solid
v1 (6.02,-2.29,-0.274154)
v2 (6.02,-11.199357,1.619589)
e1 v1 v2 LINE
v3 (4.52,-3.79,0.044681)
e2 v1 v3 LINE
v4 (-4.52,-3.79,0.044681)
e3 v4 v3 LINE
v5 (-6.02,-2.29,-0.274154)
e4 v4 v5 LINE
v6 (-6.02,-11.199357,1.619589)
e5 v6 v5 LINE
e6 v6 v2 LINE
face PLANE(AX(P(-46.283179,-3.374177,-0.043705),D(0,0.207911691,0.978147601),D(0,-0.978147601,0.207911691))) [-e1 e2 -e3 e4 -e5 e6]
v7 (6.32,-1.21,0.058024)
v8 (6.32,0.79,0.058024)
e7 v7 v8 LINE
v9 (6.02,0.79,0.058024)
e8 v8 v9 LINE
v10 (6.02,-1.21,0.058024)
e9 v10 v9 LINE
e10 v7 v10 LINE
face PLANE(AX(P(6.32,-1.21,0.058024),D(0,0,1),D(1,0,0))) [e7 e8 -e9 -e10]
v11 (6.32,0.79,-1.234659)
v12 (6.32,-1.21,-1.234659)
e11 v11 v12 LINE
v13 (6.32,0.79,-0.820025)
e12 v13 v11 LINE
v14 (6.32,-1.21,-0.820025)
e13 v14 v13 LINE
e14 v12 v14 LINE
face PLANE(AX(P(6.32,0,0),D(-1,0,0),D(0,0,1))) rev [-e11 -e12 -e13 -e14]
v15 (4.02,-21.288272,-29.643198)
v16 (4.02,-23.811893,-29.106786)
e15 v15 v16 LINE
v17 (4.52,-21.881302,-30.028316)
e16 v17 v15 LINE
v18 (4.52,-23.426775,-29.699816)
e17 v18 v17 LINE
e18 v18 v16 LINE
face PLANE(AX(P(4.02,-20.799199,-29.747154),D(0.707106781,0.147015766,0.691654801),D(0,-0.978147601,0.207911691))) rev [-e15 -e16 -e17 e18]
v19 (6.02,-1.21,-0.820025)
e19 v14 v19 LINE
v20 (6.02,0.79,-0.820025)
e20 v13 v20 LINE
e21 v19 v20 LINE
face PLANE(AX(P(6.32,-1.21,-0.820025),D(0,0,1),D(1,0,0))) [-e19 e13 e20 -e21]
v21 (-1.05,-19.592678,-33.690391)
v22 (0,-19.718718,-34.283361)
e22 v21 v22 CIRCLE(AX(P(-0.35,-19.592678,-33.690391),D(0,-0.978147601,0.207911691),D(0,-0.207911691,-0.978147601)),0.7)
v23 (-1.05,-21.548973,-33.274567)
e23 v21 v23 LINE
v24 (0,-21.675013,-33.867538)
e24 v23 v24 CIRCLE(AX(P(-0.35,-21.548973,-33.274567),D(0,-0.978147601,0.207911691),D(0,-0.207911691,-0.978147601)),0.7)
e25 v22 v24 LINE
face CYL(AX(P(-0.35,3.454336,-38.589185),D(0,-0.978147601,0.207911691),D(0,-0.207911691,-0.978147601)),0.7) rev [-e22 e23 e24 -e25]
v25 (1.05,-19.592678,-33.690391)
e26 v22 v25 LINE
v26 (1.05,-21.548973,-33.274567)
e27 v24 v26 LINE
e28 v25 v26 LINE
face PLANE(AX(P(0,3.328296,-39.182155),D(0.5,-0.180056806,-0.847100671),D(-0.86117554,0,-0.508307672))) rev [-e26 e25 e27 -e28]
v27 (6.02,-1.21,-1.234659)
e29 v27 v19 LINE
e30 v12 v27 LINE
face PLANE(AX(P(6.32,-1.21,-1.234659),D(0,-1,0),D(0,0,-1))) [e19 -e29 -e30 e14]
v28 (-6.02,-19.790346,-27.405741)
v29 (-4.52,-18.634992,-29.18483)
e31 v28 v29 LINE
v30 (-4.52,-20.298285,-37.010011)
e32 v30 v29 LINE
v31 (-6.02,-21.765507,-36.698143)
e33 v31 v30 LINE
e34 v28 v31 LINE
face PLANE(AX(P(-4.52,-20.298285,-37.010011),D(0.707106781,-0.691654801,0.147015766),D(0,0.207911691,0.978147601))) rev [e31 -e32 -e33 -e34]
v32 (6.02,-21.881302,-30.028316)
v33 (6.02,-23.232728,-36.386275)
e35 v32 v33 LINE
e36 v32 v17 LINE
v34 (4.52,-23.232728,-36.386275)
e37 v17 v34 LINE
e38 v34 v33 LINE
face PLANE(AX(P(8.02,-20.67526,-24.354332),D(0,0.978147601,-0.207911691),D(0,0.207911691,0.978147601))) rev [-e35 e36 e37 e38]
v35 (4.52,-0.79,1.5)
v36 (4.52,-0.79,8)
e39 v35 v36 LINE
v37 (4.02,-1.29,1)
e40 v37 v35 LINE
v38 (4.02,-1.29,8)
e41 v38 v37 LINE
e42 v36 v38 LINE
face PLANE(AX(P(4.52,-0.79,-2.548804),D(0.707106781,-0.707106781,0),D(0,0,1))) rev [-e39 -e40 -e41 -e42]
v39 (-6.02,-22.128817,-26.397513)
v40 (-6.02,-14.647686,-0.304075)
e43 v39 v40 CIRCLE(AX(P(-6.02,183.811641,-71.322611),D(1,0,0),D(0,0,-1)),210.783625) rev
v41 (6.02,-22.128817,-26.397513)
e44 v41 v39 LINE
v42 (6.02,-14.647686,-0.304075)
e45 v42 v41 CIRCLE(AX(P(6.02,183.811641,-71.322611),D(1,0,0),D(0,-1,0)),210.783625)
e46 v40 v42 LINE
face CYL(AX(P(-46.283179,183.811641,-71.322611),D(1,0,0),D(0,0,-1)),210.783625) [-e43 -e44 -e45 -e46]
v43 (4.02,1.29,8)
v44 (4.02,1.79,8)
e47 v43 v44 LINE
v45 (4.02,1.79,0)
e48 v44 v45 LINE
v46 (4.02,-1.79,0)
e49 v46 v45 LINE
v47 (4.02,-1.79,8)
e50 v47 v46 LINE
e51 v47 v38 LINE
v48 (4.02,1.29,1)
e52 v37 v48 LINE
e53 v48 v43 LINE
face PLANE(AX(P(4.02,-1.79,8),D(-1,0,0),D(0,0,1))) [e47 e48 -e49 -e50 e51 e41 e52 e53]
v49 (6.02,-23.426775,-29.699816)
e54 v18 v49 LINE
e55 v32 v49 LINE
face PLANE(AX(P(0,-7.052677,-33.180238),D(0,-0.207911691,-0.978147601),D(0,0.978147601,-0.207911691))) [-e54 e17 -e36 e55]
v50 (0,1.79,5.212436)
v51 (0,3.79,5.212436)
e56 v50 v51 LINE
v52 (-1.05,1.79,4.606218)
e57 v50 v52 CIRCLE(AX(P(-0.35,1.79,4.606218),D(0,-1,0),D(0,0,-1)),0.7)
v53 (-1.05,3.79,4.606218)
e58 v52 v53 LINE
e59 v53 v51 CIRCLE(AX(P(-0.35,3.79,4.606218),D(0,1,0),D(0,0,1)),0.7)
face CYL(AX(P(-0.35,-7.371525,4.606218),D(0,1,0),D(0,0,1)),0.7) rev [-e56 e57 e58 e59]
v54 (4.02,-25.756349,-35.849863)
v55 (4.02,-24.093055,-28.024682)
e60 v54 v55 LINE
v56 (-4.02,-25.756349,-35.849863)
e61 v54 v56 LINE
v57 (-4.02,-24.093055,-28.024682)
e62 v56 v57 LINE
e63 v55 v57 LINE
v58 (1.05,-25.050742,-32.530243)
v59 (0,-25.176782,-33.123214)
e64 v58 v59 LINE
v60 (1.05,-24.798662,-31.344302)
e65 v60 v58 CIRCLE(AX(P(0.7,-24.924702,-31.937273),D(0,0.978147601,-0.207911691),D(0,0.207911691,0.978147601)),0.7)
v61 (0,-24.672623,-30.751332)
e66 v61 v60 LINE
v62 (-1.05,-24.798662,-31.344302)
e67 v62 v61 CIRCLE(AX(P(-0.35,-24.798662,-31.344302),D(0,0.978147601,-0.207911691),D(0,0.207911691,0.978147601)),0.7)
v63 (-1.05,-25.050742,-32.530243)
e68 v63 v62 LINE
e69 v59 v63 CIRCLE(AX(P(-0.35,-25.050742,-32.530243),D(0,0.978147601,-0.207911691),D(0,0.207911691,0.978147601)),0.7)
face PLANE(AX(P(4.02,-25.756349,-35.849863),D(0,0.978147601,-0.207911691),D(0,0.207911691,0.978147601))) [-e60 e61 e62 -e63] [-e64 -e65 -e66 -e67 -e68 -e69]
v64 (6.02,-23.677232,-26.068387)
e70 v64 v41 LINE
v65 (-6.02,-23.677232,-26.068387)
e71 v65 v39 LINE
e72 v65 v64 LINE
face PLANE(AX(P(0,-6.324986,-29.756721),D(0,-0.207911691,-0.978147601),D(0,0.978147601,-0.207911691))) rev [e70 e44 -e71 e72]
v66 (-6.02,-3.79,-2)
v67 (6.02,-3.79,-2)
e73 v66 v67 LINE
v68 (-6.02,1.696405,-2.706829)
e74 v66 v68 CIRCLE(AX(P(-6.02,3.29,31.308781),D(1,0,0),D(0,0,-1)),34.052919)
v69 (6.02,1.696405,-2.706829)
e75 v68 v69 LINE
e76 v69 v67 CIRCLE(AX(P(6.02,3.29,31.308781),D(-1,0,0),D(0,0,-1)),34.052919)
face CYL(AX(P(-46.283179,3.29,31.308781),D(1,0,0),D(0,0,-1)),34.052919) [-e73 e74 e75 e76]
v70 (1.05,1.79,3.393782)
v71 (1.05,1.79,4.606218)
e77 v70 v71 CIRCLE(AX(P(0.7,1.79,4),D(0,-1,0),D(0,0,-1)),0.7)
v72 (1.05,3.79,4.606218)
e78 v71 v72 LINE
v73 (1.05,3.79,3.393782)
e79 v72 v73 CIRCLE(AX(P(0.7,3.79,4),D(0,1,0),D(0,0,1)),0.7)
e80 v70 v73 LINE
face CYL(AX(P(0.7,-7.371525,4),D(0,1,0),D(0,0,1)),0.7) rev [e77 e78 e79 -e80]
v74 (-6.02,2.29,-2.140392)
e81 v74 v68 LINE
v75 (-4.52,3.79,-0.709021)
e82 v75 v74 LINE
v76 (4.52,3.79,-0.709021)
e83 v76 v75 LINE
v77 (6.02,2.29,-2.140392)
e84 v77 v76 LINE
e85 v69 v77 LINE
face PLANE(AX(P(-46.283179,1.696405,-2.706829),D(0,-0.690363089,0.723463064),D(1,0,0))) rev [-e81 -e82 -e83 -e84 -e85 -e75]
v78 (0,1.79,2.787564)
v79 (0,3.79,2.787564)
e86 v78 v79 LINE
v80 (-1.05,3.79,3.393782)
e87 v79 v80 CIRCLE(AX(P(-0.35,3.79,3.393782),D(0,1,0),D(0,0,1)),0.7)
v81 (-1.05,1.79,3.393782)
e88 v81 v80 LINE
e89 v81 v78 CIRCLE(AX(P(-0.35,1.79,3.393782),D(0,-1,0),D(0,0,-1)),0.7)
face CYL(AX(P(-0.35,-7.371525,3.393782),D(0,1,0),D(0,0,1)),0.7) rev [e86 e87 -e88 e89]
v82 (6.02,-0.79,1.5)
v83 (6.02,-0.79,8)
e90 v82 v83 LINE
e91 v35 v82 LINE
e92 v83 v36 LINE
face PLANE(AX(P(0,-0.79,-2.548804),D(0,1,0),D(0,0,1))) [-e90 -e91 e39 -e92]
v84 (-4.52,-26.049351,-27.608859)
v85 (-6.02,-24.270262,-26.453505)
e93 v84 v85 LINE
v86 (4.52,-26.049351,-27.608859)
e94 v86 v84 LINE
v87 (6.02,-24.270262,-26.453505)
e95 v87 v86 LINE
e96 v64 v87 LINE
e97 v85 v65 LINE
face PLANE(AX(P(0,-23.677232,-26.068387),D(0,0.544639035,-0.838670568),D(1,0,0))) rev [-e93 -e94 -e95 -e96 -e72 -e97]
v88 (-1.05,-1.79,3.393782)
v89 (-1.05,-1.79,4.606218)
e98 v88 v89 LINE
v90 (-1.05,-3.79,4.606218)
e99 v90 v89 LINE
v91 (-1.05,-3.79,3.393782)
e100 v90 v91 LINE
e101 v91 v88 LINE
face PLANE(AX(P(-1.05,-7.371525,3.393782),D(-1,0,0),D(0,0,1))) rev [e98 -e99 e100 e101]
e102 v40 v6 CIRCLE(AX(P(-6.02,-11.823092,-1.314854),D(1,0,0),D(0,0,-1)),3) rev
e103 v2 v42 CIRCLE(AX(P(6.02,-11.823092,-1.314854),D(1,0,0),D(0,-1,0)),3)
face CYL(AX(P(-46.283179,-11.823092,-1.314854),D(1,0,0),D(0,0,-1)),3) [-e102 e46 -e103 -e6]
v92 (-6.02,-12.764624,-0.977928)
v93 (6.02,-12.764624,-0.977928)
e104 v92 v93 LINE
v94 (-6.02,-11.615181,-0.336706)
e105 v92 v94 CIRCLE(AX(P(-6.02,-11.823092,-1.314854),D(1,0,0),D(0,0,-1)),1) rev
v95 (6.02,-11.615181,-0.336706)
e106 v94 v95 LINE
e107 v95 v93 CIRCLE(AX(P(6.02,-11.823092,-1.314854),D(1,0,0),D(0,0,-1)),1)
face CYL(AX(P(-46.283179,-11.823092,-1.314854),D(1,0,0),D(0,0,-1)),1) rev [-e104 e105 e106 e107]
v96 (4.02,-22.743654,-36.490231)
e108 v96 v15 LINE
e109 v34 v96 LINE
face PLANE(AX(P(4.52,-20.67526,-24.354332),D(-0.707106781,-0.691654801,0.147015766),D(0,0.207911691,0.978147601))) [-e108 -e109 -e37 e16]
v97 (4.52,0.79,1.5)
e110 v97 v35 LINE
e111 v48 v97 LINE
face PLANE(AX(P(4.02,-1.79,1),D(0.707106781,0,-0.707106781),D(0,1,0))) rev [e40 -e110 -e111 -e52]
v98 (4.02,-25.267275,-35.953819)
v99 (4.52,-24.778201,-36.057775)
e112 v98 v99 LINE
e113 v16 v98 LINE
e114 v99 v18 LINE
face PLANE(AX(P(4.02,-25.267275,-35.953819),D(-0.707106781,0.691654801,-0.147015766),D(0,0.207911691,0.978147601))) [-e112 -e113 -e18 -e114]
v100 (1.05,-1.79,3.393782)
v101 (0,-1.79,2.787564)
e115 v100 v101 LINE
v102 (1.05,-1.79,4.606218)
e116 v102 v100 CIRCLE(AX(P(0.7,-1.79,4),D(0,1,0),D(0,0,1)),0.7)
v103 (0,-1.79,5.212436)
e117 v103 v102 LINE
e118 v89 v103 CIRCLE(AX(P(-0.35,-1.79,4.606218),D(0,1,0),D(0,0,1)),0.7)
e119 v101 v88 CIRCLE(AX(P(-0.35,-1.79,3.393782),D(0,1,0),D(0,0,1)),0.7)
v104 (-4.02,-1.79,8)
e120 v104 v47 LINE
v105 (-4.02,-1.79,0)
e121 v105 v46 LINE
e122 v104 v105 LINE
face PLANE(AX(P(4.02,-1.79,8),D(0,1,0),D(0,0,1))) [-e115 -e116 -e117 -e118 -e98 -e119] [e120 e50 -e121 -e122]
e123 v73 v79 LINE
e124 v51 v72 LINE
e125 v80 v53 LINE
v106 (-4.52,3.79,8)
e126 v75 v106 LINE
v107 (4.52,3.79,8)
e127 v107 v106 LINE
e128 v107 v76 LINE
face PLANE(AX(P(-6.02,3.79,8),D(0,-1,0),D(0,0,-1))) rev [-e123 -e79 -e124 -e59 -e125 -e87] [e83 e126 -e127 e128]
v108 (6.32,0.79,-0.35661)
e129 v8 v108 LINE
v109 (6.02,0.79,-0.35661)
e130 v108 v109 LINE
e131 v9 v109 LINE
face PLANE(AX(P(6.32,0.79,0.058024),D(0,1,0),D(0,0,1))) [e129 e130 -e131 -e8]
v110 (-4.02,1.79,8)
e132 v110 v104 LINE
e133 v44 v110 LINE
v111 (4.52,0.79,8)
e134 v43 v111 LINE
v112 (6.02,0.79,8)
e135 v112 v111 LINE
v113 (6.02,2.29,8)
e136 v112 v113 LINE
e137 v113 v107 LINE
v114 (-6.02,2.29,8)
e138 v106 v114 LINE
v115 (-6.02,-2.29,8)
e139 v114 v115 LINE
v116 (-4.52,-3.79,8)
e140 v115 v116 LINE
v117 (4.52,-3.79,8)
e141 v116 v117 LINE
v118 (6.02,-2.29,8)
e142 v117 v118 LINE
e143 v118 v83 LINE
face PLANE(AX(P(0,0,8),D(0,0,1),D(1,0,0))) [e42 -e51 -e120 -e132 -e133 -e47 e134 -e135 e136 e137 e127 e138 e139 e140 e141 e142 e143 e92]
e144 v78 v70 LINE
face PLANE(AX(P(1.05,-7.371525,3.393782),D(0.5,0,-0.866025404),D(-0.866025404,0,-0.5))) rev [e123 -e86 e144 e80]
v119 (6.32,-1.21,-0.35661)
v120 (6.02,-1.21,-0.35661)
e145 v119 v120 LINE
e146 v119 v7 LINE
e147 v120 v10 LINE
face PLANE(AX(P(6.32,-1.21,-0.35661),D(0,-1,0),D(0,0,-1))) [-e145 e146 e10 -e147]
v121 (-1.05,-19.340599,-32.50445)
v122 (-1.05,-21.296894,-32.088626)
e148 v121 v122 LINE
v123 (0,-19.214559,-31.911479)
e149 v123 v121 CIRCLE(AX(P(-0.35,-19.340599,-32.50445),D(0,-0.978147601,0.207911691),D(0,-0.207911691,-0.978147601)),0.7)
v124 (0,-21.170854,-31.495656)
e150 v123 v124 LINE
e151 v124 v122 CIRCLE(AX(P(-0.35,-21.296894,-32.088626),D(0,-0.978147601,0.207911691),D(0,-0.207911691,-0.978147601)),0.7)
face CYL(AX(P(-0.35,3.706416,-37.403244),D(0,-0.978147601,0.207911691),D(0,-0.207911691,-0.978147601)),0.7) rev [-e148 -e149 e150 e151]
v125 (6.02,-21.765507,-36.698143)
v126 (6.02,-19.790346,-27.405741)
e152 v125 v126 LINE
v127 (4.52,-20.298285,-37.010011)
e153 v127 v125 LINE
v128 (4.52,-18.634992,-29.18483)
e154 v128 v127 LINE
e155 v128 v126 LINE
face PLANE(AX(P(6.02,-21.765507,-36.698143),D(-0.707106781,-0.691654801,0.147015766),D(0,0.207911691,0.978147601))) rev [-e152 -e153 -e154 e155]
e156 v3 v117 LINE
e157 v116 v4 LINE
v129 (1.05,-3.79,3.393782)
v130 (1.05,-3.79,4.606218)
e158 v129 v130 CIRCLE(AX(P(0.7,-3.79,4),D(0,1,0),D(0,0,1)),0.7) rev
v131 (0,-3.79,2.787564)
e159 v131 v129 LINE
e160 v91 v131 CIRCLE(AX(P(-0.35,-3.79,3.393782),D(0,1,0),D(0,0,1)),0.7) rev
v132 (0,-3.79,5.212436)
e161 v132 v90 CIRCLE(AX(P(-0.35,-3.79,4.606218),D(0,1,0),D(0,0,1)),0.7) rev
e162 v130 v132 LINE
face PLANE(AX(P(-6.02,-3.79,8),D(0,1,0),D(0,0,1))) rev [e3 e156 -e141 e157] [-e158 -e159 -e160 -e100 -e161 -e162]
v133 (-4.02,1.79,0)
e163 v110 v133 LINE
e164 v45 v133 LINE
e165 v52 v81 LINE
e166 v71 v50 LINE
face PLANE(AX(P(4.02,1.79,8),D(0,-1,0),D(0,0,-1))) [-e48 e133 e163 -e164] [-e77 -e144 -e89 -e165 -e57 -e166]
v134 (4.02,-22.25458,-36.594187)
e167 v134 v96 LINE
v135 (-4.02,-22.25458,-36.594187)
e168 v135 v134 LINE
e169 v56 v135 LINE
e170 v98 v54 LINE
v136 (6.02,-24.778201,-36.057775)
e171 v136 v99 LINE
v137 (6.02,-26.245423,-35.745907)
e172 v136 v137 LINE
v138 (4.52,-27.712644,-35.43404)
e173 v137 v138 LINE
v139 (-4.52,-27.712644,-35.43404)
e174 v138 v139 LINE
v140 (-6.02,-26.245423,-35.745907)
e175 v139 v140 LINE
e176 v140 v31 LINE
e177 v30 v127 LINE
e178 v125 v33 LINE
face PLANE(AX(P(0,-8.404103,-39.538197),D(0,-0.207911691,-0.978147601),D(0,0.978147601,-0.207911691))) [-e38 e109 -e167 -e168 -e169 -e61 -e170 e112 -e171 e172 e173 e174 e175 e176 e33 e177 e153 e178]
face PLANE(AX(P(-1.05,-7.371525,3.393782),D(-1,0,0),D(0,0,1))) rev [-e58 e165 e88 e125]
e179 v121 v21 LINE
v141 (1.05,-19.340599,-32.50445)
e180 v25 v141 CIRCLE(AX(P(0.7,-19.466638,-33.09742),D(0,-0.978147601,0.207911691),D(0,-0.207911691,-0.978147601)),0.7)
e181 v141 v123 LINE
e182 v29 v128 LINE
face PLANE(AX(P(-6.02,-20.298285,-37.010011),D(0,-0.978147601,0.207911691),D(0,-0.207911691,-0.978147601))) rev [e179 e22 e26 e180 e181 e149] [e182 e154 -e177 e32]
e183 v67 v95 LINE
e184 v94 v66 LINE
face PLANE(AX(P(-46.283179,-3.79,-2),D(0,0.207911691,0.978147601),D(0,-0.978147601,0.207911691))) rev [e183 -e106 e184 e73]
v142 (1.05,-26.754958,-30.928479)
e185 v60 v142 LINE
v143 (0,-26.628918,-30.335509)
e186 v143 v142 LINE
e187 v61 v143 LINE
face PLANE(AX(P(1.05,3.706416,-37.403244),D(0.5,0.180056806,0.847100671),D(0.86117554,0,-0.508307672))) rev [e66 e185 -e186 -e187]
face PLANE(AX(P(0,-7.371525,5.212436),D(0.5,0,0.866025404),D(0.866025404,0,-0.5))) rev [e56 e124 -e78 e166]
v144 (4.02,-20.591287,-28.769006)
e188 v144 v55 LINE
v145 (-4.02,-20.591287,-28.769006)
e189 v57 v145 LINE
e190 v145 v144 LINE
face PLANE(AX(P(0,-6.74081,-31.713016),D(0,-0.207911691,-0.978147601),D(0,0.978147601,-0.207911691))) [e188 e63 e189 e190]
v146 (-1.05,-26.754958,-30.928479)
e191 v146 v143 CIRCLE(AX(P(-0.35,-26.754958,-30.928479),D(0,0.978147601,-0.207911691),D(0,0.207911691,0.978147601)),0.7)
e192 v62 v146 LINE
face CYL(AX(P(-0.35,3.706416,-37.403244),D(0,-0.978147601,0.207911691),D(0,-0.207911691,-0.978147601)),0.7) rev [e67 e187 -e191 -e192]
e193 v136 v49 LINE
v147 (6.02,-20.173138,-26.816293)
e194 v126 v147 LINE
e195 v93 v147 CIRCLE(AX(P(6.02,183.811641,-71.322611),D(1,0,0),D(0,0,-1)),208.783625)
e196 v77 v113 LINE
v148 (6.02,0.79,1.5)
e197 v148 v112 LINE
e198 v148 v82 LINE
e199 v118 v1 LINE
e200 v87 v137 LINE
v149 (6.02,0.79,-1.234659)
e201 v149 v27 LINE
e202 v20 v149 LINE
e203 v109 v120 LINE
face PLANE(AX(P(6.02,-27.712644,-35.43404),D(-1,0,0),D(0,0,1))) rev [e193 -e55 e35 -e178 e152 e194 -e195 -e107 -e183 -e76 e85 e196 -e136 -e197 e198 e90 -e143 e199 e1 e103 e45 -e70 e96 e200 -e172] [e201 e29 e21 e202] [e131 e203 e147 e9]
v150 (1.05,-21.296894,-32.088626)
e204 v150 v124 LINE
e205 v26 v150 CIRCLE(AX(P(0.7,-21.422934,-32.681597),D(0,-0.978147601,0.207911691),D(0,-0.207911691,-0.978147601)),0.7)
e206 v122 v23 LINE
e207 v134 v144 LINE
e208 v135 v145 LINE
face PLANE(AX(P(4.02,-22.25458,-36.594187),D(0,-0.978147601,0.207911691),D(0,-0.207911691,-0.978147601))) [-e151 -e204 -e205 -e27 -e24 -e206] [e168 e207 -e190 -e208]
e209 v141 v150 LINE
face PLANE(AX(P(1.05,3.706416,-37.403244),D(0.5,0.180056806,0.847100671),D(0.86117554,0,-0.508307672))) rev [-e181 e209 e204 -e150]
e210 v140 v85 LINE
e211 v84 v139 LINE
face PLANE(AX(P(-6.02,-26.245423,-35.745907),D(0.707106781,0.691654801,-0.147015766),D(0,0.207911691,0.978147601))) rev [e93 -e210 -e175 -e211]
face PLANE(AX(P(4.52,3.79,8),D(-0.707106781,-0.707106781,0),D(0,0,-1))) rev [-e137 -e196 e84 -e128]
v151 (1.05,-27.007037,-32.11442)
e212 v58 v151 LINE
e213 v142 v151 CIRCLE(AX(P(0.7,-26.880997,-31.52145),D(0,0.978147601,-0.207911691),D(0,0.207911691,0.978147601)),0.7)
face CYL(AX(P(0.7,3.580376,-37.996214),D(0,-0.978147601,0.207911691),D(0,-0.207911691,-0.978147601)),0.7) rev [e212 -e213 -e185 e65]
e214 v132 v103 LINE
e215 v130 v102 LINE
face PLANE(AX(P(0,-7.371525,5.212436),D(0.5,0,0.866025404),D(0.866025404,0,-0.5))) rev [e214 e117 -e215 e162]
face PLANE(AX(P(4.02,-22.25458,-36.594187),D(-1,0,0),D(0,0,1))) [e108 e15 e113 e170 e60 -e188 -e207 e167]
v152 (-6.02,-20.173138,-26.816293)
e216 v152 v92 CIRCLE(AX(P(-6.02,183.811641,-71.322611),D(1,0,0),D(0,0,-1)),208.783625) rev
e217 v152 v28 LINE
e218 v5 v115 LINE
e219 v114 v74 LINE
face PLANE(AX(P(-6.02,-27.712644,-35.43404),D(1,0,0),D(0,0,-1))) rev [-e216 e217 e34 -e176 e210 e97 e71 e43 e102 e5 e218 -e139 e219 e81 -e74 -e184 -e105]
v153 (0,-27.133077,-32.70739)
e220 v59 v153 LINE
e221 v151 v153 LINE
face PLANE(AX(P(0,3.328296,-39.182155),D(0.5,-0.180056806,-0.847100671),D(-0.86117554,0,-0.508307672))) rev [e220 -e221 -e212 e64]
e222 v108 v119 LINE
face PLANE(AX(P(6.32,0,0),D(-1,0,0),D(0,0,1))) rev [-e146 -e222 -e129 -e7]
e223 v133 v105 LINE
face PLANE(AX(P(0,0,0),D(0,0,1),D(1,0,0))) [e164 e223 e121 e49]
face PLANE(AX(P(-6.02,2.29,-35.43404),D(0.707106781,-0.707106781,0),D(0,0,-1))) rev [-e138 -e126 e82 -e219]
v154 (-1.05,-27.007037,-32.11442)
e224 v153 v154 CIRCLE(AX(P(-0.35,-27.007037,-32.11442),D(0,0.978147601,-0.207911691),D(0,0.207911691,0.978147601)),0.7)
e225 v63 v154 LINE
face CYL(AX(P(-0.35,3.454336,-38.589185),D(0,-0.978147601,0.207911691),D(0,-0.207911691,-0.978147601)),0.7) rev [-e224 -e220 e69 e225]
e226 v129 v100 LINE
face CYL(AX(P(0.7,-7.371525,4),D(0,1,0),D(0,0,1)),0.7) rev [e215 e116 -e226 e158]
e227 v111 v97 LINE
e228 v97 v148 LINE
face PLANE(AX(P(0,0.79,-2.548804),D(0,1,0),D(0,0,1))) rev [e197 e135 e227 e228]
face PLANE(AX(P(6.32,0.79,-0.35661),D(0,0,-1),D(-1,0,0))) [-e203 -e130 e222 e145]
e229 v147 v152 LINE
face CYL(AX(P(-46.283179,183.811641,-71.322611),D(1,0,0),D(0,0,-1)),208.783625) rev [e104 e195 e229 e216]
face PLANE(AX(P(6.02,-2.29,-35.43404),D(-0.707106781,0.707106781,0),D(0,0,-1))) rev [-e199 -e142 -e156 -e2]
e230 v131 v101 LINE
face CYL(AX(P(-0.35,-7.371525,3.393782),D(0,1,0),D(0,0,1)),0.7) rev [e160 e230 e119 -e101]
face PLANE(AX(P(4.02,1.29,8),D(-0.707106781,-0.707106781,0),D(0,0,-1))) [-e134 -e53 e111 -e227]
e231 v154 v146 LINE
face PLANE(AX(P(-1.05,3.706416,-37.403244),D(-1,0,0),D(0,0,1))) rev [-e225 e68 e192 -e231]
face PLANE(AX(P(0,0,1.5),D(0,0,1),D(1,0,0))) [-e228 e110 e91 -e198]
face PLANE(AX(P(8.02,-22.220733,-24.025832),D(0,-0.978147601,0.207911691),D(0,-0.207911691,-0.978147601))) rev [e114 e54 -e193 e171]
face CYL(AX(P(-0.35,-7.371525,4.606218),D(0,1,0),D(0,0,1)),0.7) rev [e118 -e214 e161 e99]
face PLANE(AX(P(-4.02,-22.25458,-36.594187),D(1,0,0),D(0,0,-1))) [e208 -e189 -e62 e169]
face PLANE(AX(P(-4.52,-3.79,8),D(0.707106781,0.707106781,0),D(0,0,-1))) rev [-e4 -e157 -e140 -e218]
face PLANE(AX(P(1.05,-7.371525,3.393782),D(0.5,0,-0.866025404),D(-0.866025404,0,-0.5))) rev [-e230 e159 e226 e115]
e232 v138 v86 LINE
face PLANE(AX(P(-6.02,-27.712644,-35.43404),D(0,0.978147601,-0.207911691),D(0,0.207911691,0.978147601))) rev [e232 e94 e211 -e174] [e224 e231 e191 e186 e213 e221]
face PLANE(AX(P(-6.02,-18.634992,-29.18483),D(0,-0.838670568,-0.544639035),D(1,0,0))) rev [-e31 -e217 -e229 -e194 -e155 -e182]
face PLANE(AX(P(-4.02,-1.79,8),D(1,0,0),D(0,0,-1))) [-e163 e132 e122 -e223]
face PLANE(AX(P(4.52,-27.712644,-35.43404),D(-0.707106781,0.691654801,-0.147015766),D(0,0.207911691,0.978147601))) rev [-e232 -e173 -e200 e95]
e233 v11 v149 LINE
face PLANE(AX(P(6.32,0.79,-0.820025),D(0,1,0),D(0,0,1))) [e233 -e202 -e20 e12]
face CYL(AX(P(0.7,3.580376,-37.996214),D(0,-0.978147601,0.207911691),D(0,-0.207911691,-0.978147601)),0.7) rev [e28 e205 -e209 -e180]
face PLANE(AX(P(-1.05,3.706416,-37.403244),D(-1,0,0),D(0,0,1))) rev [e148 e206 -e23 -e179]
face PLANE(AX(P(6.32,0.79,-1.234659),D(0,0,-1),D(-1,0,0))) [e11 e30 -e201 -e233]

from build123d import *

# Parameters (mm, degrees)
SKETCH1_W                      = 12.04
SKETCH1_H                      = 7.58
SKETCH1_W_2                    = 8.04
SKETCH1_H_2                    = 3.58
BOSS_EXTRUDE1_DEPTH            = 8
SKETCH1_2_W                    = 12.04
SKETCH1_2_H                    = 7.58
SKETCH1_2_W_2                  = 8.04
SKETCH1_2_H_2                  = 3.58
BOSS_EXTRUDE2_DEPTH            = 2
EXTRUDE_THIN1_DEPTH            = 12.04
SKETCH5_W                      = 12.04
SKETCH5_H                      = 7.58
SKETCH5_W_2                    = 8.04
SKETCH5_H_2                    = 3.58
BOSS_EXTRUDE4_DEPTH            = 8
SKETCH5_4_W                    = 12.04
SKETCH5_4_H                    = 7.58
BOSS_EXTRUDE5_DEPTH            = 2
CHAMFER1_SIZE                  = 1.5
CHAMFER2_START                 = -7
CHAMFER2_DEPTH                 = 14
CUT_EXTRUDE1_REACH             = 50.973
CUT_EXTRUDE1_DIRECTION_2_DEPTH = 49.973440368
CUT_EXTRUDE2_DEPTH             = 48.541116576
CUT_EXTRUDE2_DEPTH_BACK        = 48.541116576
SKETCH8_W                      = 2
SKETCH8_H                      = 1.58
CUT_EXTRUDE3_DEPTH             = 6.5
SKETCH9_W                      = 4
SKETCH9_H                      = 1.58
CUT_EXTRUDE4_DEPTH             = 6.5
CHAMFER3_SIZE                  = 0.5
SKETCH10_W                     = 0.414634146
SKETCH10_H                     = 2
SKETCH10_W_2                   = 0.414634147
BOSS_EXTRUDE6_DEPTH            = 0.3


with BuildPart() as part:
    # Sketch1 → Boss-Extrude1 (new body)
    with BuildSketch(Plane.XY):
        Rectangle(SKETCH1_W, SKETCH1_H)
        Rectangle(SKETCH1_W_2, SKETCH1_H_2, mode=Mode.SUBTRACT)
    extrude(amount=BOSS_EXTRUDE1_DEPTH)

    # Sketch1<2> → Boss-Extrude2 (add)
    # profile 1 of 2: a face of its own
    with BuildSketch(Plane.XY):
        Rectangle(SKETCH1_2_W, SKETCH1_2_H)
        Rectangle(SKETCH1_2_W_2, SKETCH1_2_H_2, mode=Mode.SUBTRACT)
    # profile 2 of 2: a face of its own
    with BuildSketch(Plane.XY):
        Rectangle(SKETCH1_2_W_2, SKETCH1_2_H_2)
    extrude(amount=-BOSS_EXTRUDE2_DEPTH)

    # Sketch3 → Extrude-Thin1 (add)
    with BuildSketch(Plane(origin=(6.02, 9.81, 0), x_dir=(0, -1, 0), z_dir=(1, 0, 0))):
        with BuildLine():
            Line((6.02, 2.744137986), (6.52, 2.744137986))
            ThreePointArc((6.52, 2.744137986), (10.07949931, 2.557592532), (13.6, 2))
            Line((13.6, 2), (21.425180806, 0.336706473))
            ThreePointArc((21.425180806, 0.336706473), (22.120268588, 0.441550315), (22.574623539, 0.977927827))
            ThreePointArc((22.574623539, 0.977927827), (26.849152106, 14.317688881), (30.219561316, 27.914054616))
            Line((30.219561316, 27.914054616), (30.401286915, 28.769006338))
            Line((30.401286915, 28.769006338), (32.357582116, 28.353182957))
            Line((32.357582116, 28.353182957), (32.175856518, 27.498231234))
            ThreePointArc((32.175856518, 27.498231234), (28.773161162, 13.771621897), (24.457685624, 0.304075332))
            ThreePointArc((24.457685624, 0.304075332), (23.094620772, -1.305057203), (21.009357424, -1.619588728))
            Line((21.009357424, -1.619588728), (13.184176618, 0.043704799))
            ThreePointArc((13.184176618, 0.043704799), (9.870442383, 0.568548741), (6.52, 0.744137986))
            Line((6.52, 0.744137986), (6.02, 0.744137986))
            Line((6.02, 0.744137986), (6.02, 2.744137986))
        make_face()
    extrude(amount=-EXTRUDE_THIN1_DEPTH)



with BuildPart() as body_2:
    # Sketch5 → Boss-Extrude4 (new body)
    with BuildSketch(Plane(origin=(0, 484.189145571, -136.063399466), x_dir=(1, 0, 0), z_dir=(0, -0.20791169081775487, -0.9781476007338067))):
        with Locations((0, 517.847527624)):
            Rectangle(SKETCH5_W, SKETCH5_H)
        with Locations((0, 517.847527624)):
            Rectangle(SKETCH5_W_2, SKETCH5_H_2, mode=Mode.SUBTRACT)
    extrude(amount=BOSS_EXTRUDE4_DEPTH)


with BuildPart() as part_1:
    add(part.part)

    add(body_2.part)  # Boss-Extrude5 merges body 2
    # Sketch5<4> → Boss-Extrude5 (add)
    with BuildSketch(Plane(origin=(0, 484.189145571, -136.063399466), x_dir=(1, 0, 0), z_dir=(0, -0.20791169081775487, -0.9781476007338067))):
        with Locations((0, 517.847527624)):
            Rectangle(SKETCH5_4_W, SKETCH5_4_H)
    extrude(amount=-BOSS_EXTRUDE5_DEPTH)

    # Chamfer1
    chamfer1_edges = [part_1.edges().sort_by_distance(p)[0] for p in [
        (6.02, -26.673085599, -30.543301906),
        (-6.02, -26.673085599, -30.543301906),
        (6.02, 3.79, 2.627931007),
        (6.02, -3.79, 4.022340595),
        (-6.02, -3.79, 4.022340595),
        (-6.02, 3.79, 2.627931007),
        (6.02, -19.258726786, -32.119272522),
        (-6.02, -19.258726786, -32.119272522),
    ]]
    chamfer(chamfer1_edges, length=CHAMFER1_SIZE)

    # Chamfer2: read off the stored shape, not the designer's step
    # Chamfer2 outline → Chamfer2 (cut)
    with BuildSketch(Plane.YZ.offset(CHAMFER2_START)):
        with BuildLine():
            Line((3.79, -2.744137986), (3.79, -0.709020541))
            Line((3.79, -0.709020541), (1.696404781, -2.706829325))
            ThreePointArc((1.696404781, -2.706829325), (2.492984056, -2.734809543), (3.29, -2.744137986))
            Line((3.29, -2.744137986), (3.79, -2.744137986))
        make_face()
        Polygon((-25.633527145, -25.652563902), (-26.049350527, -27.608859104), (-23.677231944, -26.068387284), align=None)
        with BuildLine():
            ThreePointArc((-20.172493797, -26.813342374), (-20.172815684, -26.814817596), (-20.173137561, -26.81629282))
            Line((-20.173137561, -26.81629282), (-18.634991713, -29.18482972))
            Line((-18.634991713, -29.18482972), (-18.219168332, -27.228534519))
            Line((-18.219168332, -27.228534519), (-20.172493797, -26.813342374))
        make_face()
    extrude(amount=CHAMFER2_DEPTH, mode=Mode.SUBTRACT)

    # Cut-Extrude1: up to this face of the body (flat: up to its plane)
    cut_extrude1_end = Plane(part_1.part.faces().sort_by_distance((0, -3.79, 4.022340595))[0])
    # Sketch6 → Cut-Extrude1 (cut, up to the picked face)
    with BuildSketch(Plane(origin=(0, 3.79, 0), x_dir=(1, 0, 0), z_dir=(0, 1, 0)), mode=Mode.PRIVATE) as cut_extrude1_sk1:
        with BuildLine():
            Line((1.05, -3.393782217), (0, -2.787564435))
            ThreePointArc((0, -2.787564435), (-0.7, -2.787564435), (-1.05, -3.393782217))
            Line((-1.05, -3.393782217), (-1.05, -4.606217783))
            ThreePointArc((-1.05, -4.606217783), (-0.7, -5.212435565), (0, -5.212435565))
            Line((0, -5.212435565), (1.05, -4.606217783))
            ThreePointArc((1.05, -4.606217783), (1.4, -4), (1.05, -3.393782217))
        make_face()
    cut_extrude1_tool1 = split(extrude(cut_extrude1_sk1.sketch, amount=-CUT_EXTRUDE1_REACH, mode=Mode.PRIVATE), bisect_by=cut_extrude1_end, keep=Keep.BOTH, mode=Mode.PRIVATE)
    add(cut_extrude1_tool1.solids().sort_by(Axis((0, 3.79, 4), (0, -1, 0)))[0], mode=Mode.SUBTRACT)

    # Sketch6 → Cut-Extrude1 direction 2 (cut)
    with BuildSketch(Plane(origin=(0, 3.79, 0), x_dir=(1, 0, 0), z_dir=(0, 1, 0))):
        with BuildLine():
            Line((1.05, -3.393782217), (0, -2.787564435))
            ThreePointArc((0, -2.787564435), (-0.7, -2.787564435), (-1.05, -3.393782217))
            Line((-1.05, -3.393782217), (-1.05, -4.606217783))
            ThreePointArc((-1.05, -4.606217783), (-0.7, -5.212435565), (0, -5.212435565))
            Line((0, -5.212435565), (1.05, -4.606217783))
            ThreePointArc((1.05, -4.606217783), (1.4, -4), (1.05, -3.393782217))
        make_face()
    extrude(amount=CUT_EXTRUDE1_DIRECTION_2_DEPTH, mode=Mode.SUBTRACT)

    # Sketch7 → Cut-Extrude2 (cut, two sides: drawn at the far end of the back side and taken through both)
    with BuildSketch(Plane(origin=(0, -19.308540852, 4.104157054), x_dir=(1, 0, 0), z_dir=(0, -0.9781476007338067, 0.2079116908177549)).offset(-CUT_EXTRUDE2_DEPTH_BACK)):
        with BuildLine():
            Line((1.05, -35.815286021), (0, -35.209068239))
            ThreePointArc((0, -35.209068239), (-0.7, -35.209068239), (-1.05, -35.815286021))
            Line((-1.05, -35.815286021), (-1.05, -37.027721587))
            ThreePointArc((-1.05, -37.027721587), (-0.7, -37.633939369), (0, -37.633939369))
            Line((0, -37.633939369), (1.05, -37.027721587))
            ThreePointArc((1.05, -37.027721587), (1.4, -36.421503804), (1.05, -35.815286021))
        make_face()
    extrude(amount=CUT_EXTRUDE2_DEPTH + CUT_EXTRUDE2_DEPTH_BACK, mode=Mode.SUBTRACT)

    # Sketch8 → Cut-Extrude3 (cut)
    with BuildSketch(Plane.XY.offset(8)):
        with Locations((5.02, 0)):
            Rectangle(SKETCH8_W, SKETCH8_H)
    extrude(amount=-CUT_EXTRUDE3_DEPTH, mode=Mode.SUBTRACT)

    # Sketch9 → Cut-Extrude4 (cut)
    with BuildSketch(Plane(origin=(0, -8.404103201, -39.538196964), x_dir=(-1, 0, 0), z_dir=(0, -0.20791169081775673, -0.9781476007338064))):
        with Locations((-6.02, -15.949905141)):
            Rectangle(SKETCH9_W, SKETCH9_H)
    extrude(amount=-CUT_EXTRUDE4_DEPTH, mode=Mode.SUBTRACT)

    # Chamfer3
    chamfer3_edges = [part_1.edges().sort_by_distance(p)[0] for p in [
        (4.02, -0.79, 4.75),
        (4.02, 0.79, 4.75),
        (4.02, 0, 1.5),
        (4.02, -24.102488256, -32.87879528),
        (4.02, -22.654038656, -29.864065813),
        (4.02, -22.557015047, -33.207295751),
    ]]
    chamfer(chamfer3_edges, length=CHAMFER3_SIZE)

    # Sketch10 → Boss-Extrude6 (add)
    with BuildSketch(Plane(origin=(6.02, 0, 0), x_dir=(0, 0, -1), z_dir=(1, 0, 0))):
        with Locations((0.149293265, -0.21)):
            Rectangle(SKETCH10_W, SKETCH10_H)
        with Locations((1.027342045, -0.21)):
            Rectangle(SKETCH10_W_2, SKETCH10_H)
    extrude(amount=BOSS_EXTRUDE6_DEPTH)


solid = part_1.part
